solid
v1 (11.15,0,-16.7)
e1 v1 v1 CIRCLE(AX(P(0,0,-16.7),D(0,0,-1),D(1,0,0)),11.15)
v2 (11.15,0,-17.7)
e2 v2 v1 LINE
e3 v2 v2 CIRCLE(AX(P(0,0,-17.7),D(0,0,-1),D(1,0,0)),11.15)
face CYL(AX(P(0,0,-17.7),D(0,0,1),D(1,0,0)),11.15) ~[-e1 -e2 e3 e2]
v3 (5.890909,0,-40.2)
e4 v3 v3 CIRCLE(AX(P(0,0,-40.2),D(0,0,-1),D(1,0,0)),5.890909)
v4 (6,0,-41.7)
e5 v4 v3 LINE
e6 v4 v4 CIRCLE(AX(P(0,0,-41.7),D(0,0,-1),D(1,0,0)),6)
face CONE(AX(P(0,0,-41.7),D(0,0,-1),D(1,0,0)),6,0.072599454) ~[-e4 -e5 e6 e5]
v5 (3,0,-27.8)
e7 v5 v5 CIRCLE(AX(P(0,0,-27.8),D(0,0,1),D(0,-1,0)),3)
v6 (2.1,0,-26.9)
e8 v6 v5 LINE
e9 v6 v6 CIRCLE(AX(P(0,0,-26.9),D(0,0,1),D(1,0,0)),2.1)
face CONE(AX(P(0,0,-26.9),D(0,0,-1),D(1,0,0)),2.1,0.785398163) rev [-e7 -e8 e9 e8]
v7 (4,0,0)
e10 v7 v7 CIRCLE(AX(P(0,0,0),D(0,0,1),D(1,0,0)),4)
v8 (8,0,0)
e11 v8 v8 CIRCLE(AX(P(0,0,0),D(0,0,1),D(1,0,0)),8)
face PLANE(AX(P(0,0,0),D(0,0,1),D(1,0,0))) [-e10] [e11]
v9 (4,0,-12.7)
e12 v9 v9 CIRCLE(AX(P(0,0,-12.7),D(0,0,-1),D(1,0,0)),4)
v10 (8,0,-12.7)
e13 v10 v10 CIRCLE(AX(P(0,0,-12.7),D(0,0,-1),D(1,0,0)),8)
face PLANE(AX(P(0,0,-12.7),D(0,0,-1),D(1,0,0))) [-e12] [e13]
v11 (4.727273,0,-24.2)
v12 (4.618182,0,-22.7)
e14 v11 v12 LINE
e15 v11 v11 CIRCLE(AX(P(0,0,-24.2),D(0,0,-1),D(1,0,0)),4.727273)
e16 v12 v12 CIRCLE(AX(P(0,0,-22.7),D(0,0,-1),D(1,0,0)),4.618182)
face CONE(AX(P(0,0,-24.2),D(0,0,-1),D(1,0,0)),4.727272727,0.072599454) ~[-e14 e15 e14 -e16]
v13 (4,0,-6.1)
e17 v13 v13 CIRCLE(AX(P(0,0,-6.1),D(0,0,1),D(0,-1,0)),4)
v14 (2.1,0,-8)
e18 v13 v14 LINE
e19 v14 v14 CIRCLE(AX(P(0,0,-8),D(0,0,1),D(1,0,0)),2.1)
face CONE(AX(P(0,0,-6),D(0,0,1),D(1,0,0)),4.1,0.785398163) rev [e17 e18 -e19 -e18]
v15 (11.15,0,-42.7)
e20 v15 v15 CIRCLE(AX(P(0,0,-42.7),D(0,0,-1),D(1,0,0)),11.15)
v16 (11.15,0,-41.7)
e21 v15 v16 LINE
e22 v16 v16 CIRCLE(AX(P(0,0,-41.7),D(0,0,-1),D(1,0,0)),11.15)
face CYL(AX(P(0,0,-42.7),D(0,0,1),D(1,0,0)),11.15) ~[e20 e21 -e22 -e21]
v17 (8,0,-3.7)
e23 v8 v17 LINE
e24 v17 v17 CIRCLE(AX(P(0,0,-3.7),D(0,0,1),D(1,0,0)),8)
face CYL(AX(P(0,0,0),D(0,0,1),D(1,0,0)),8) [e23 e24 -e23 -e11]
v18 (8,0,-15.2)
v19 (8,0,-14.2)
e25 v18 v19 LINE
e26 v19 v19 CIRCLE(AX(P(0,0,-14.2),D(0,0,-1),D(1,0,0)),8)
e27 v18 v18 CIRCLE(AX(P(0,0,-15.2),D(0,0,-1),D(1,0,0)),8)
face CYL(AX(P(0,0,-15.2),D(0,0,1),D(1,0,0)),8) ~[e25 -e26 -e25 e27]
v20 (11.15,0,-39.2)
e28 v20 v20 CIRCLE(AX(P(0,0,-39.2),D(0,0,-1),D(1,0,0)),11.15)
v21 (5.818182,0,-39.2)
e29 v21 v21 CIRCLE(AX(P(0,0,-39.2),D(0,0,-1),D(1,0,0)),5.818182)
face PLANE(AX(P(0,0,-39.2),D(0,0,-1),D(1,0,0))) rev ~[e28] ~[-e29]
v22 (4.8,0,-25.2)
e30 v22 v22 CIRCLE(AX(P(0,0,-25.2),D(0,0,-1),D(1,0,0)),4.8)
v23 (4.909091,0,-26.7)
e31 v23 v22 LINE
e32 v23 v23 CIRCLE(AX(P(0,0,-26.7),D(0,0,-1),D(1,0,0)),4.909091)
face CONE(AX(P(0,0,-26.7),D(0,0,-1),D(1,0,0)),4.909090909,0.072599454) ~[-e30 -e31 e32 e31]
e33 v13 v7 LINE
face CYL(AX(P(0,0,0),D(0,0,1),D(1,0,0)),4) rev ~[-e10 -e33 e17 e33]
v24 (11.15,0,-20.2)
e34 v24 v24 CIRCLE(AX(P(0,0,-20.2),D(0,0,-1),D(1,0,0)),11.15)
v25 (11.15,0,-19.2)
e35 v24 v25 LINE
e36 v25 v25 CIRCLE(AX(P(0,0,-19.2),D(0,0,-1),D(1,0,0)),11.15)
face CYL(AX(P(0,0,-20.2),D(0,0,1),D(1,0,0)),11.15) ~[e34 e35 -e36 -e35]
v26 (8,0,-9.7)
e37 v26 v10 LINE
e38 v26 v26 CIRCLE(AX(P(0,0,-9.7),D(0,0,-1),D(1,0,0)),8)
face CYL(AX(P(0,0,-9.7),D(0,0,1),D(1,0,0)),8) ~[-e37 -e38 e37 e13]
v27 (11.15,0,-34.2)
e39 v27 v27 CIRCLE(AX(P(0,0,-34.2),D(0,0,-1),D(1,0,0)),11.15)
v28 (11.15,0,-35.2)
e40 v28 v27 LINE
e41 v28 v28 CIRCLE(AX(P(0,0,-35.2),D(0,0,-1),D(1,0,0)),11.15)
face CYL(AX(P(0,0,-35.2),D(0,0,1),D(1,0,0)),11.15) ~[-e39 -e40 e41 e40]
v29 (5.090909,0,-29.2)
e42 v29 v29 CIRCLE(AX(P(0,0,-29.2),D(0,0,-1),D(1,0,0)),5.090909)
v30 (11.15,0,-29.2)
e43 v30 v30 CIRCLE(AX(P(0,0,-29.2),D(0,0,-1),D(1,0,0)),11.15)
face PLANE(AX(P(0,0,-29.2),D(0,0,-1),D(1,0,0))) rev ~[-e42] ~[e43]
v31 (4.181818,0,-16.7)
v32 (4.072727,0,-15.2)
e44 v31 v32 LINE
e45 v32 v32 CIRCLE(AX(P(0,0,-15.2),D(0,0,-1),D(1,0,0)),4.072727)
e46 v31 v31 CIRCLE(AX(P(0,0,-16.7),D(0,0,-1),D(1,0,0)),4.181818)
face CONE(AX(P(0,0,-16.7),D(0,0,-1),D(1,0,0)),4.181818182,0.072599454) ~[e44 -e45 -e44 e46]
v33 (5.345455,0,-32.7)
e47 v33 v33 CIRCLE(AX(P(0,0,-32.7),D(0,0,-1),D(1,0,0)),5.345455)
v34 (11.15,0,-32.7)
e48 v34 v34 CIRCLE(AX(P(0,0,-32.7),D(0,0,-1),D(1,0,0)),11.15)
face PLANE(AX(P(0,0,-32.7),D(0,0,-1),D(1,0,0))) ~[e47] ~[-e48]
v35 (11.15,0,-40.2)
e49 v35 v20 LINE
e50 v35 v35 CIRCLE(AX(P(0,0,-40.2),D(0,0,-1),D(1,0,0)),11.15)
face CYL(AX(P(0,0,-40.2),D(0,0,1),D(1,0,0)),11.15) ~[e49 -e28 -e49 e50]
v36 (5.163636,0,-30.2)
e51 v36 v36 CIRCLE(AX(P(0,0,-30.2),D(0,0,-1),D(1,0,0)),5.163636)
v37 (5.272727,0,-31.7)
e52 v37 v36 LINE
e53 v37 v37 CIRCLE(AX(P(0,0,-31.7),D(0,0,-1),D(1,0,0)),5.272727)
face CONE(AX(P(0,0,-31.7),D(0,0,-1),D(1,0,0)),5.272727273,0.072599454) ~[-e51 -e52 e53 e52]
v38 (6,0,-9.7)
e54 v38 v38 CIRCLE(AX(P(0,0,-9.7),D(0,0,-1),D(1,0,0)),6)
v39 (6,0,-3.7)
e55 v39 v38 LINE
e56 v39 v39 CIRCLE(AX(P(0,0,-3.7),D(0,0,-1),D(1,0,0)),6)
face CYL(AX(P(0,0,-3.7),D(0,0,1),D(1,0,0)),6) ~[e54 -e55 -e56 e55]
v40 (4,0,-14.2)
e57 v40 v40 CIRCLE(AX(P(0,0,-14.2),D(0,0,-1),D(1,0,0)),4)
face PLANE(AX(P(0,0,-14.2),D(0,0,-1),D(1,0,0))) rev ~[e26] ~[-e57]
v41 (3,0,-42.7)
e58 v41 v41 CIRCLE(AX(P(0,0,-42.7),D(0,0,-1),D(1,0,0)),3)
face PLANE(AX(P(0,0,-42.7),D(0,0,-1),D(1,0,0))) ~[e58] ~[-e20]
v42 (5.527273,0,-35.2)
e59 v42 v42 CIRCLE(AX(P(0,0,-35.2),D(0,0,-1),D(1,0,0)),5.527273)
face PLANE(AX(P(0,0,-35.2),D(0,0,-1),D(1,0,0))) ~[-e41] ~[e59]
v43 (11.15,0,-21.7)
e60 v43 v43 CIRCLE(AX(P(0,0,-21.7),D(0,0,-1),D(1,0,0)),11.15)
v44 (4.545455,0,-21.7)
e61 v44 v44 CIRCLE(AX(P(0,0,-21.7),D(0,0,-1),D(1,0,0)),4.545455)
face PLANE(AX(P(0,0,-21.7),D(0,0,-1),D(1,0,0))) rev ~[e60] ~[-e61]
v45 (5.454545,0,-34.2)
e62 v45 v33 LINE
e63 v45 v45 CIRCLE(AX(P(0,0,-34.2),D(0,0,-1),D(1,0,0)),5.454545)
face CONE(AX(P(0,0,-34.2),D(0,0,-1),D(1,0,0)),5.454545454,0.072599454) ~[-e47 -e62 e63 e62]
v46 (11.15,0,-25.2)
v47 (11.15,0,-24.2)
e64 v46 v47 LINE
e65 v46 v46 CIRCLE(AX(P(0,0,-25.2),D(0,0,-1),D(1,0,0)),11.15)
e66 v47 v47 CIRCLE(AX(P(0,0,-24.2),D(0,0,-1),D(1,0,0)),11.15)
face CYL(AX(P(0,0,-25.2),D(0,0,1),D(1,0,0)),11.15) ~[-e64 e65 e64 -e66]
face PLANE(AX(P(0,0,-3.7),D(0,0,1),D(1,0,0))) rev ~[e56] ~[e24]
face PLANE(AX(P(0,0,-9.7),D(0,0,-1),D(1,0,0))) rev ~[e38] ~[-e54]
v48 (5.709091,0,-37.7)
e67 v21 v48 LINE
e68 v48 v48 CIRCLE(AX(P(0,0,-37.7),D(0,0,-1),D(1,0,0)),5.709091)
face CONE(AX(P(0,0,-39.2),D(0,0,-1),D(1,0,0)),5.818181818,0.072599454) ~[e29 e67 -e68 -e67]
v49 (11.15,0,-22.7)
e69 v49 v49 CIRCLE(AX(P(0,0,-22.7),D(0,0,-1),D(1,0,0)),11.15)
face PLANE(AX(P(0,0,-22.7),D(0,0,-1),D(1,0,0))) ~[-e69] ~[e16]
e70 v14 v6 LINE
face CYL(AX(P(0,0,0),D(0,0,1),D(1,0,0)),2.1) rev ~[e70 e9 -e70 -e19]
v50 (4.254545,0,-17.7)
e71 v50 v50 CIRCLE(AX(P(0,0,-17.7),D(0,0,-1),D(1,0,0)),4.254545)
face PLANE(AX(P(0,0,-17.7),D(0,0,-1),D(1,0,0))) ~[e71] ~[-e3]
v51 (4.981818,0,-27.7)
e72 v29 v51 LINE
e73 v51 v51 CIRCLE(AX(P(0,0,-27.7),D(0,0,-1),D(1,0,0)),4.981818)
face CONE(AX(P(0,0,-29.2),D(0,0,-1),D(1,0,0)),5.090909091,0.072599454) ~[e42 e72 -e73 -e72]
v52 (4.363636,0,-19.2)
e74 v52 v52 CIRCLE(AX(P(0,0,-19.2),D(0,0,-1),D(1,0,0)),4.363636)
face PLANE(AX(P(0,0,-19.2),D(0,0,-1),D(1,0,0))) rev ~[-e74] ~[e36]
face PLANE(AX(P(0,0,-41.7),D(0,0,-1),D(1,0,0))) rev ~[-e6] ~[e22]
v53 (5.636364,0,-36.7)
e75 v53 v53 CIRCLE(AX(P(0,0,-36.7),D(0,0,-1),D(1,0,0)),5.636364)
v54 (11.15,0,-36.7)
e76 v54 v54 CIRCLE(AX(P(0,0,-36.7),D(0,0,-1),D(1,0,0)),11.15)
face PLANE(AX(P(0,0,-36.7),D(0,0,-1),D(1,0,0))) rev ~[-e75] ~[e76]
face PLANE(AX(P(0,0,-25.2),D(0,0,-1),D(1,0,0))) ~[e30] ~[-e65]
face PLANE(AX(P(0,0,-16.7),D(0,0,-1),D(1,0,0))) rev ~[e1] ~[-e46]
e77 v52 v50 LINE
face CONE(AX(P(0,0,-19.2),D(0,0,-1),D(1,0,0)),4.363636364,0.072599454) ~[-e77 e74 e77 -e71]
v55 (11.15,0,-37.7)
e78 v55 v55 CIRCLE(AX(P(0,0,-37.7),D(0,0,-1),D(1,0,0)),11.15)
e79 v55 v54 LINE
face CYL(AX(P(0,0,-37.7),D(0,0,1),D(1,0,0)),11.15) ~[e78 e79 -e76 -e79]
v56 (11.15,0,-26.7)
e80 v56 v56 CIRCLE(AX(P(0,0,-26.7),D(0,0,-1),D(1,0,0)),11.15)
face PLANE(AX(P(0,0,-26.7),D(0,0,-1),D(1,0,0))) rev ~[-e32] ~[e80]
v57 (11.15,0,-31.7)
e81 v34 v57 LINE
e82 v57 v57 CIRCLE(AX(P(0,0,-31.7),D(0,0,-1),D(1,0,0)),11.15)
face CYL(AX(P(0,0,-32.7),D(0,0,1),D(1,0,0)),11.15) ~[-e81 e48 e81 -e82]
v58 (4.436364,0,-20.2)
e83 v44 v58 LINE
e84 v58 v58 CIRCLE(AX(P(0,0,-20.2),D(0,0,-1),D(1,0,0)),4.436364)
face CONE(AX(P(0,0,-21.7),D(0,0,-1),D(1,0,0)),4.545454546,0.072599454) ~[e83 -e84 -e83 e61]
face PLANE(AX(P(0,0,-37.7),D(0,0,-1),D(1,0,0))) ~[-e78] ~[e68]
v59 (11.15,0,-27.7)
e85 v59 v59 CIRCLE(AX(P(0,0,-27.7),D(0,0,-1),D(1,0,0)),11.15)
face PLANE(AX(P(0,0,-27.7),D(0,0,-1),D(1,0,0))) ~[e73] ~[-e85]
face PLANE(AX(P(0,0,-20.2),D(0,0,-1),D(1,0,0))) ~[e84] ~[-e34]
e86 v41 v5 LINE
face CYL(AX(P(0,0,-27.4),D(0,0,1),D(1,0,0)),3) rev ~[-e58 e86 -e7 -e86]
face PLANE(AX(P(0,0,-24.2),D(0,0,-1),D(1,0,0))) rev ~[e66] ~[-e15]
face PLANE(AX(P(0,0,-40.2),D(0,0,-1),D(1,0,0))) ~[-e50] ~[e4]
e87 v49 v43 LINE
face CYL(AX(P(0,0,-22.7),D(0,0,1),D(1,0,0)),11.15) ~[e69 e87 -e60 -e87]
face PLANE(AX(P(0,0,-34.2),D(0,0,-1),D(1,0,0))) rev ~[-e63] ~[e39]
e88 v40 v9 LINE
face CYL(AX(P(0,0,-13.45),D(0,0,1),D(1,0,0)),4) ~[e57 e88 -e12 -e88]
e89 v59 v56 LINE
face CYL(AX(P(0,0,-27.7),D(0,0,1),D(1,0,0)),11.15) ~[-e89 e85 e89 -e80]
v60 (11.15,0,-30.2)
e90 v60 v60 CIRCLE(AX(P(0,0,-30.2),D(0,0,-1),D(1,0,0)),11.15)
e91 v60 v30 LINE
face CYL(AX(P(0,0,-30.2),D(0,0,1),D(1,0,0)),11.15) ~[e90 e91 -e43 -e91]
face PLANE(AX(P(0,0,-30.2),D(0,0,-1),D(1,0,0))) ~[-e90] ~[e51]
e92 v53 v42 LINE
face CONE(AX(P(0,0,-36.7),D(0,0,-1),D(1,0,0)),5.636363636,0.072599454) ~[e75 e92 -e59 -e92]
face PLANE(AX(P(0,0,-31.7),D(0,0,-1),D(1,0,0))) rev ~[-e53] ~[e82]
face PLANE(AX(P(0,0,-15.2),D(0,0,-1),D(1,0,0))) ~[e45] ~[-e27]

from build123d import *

# Parameters (mm, degrees)
F0_R         = 8
F1_DEPTH     = 3.7
F2_R         = 6
F3_DEPTH     = 6
F4_R         = 8
F5_DEPTH     = 3
F6_W         = 4
F6_H         = 1.5
F8_R         = 2.1
F9_DEPTH     = 42.7
F10_R        = 4
F11_DEPTH    = 6
F12_S5_R     = 4
F12_T6_DEPTH = 7
F13_R        = 3
F14_DEPTH    = 14.8
F15_S5_R     = 3
F15_T6_DEPTH = 6


# Not quite as in the source:
# - a fillet or chamfer that OpenCascade refuses, or shapes differently, is made with other operations: its cross-section is extruded or revolved along the edge and cut away or added


with BuildPart() as f1:
    # F0 (on Top) → F1 (new body)
    with BuildSketch(Plane.XY):
        Circle(F0_R)
    extrude(amount=-F1_DEPTH)

    # F2 (on face) → F3 (join)
    with BuildSketch(Plane(origin=(0, 0, -3.7), x_dir=(1, 0, 0), z_dir=(0, 0, -1))):
        Circle(F2_R)
    extrude(amount=F3_DEPTH)

    # F4 (on face) → F5 (join)
    with BuildSketch(Plane(origin=(0, 0, -9.7), x_dir=(1, 0, 0), z_dir=(0, 0, -1))):
        Circle(F4_R)
    extrude(amount=F5_DEPTH)

    # F6 (on Front) → F7 (revolve)
    with BuildSketch(Plane.XZ):
        with Locations((2, -13.45)):
            Rectangle(F6_W, F6_H)
        Polygon((4, -14.2), (0, -14.2), (0, -15.2), (4.0727272727, -15.2), (8, -15.2), (8, -14.2), align=None)
        Polygon((4.0727272727, -15.2), (0, -15.2), (0, -16.7), (4.1818181818, -16.7), align=None)
        Polygon((4.1818181818, -16.7), (0, -16.7), (0, -17.7), (4.2545454545, -17.7), (11.15, -17.7), (11.15, -16.7), align=None)
        Polygon((4.2545454545, -17.7), (0, -17.7), (0, -19.2), (4.3636363636, -19.2), align=None)
        Polygon((4.3636363636, -19.2), (0, -19.2), (0, -20.2), (4.4363636364, -20.2), (11.15, -20.2), (11.15, -19.2), align=None)
        Polygon((4.4363636364, -20.2), (0, -20.2), (0, -21.7), (4.5454545455, -21.7), align=None)
        Polygon((4.5454545455, -21.7), (0, -21.7), (0, -22.7), (4.6181818182, -22.7), (11.15, -22.7), (11.15, -21.7), align=None)
        Polygon((4.6181818182, -22.7), (0, -22.7), (0, -24.2), (4.7272727273, -24.2), align=None)
        Polygon((4.7272727273, -24.2), (0, -24.2), (0, -25.2), (4.8, -25.2), (11.15, -25.2), (11.15, -24.2), align=None)
        Polygon((4.8, -25.2), (0, -25.2), (0, -26.7), (4.9090909091, -26.7), align=None)
        Polygon((4.9090909091, -26.7), (0, -26.7), (0, -27.7), (4.9818181818, -27.7), (11.15, -27.7), (11.15, -26.7), align=None)
        Polygon((4.9818181818, -27.7), (0, -27.7), (0, -29.2), (5.0909090909, -29.2), align=None)
        Polygon((5.0909090909, -29.2), (0, -29.2), (0, -30.2), (5.1636363636, -30.2), (11.15, -30.2), (11.15, -29.2), align=None)
        Polygon((5.1636363636, -30.2), (0, -30.2), (0, -31.7), (5.2727272727, -31.7), align=None)
        Polygon((5.2727272727, -31.7), (0, -31.7), (0, -32.7), (5.3454545455, -32.7), (11.15, -32.7), (11.15, -31.7), align=None)
        Polygon((5.3454545455, -32.7), (0, -32.7), (0, -34.2), (5.4545454545, -34.2), align=None)
        Polygon((5.4545454545, -34.2), (0, -34.2), (0, -35.2), (5.5272727273, -35.2), (11.15, -35.2), (11.15, -34.2), align=None)
        Polygon((5.5272727273, -35.2), (0, -35.2), (0, -36.7), (5.6363636364, -36.7), align=None)
        Polygon((5.6363636364, -36.7), (0, -36.7), (0, -37.7), (5.7090909091, -37.7), (11.15, -37.7), (11.15, -36.7), align=None)
        Polygon((5.7090909091, -37.7), (0, -37.7), (0, -39.2), (5.8181818182, -39.2), align=None)
        Polygon((5.8181818182, -39.2), (0, -39.2), (0, -40.2), (5.8909090909, -40.2), (11.15, -40.2), (11.15, -39.2), align=None)
        Polygon((5.8909090909, -40.2), (0, -40.2), (0, -41.7), (6, -41.7), align=None)
        Polygon((6, -41.7), (0, -41.7), (0, -42.7), (11.15, -42.7), (11.15, -41.7), align=None)
    revolve(axis=Axis((0, 0, -6.35), (0, 0, -1)))

    # F8 (on face) → F9 (cut)
    with BuildSketch(Plane.XY):
        Circle(F8_R)
    extrude(amount=-F9_DEPTH, mode=Mode.SUBTRACT)

    # F10 (on face) → F11 (cut)
    with BuildSketch(Plane.XY):
        Circle(F10_R)
    extrude(amount=-F11_DEPTH, mode=Mode.SUBTRACT)

    # F12: chamfer of 2 on 1 edges, made by hand


with BuildPart() as f12_tool2:
    # F12_s3 → F12_t4 (revolve)
    with BuildSketch(Plane.XZ):
        Polygon((4.1, -6), (2.1, -8), (2.1, -6), align=None)
    revolve(axis=Axis((0, 0, -6), (0, 0, 1)))

    # F12_s5 → F12_t6 (intersect, symmetric)
    with BuildSketch(Plane.XY.offset(-7)):
        Circle(F12_S5_R)
    extrude(amount=F12_T6_DEPTH, both=True, mode=Mode.INTERSECT)


with BuildPart() as f1_1:
    add(f1.part)

    # F12_t1: cut F12_tool2
    add(f12_tool2.part, mode=Mode.SUBTRACT)

    # F13 (on face) → F14 (cut)
    with BuildSketch(Plane(origin=(0, 0, -42.7), x_dir=(1, 0, 0), z_dir=(0, 0, -1))):
        Circle(F13_R)
    extrude(amount=-F14_DEPTH, mode=Mode.SUBTRACT)

    # F15: chamfer of 1 on 1 edges, made by hand


with BuildPart() as f15_tool2:
    # F15_s3 → F15_t4 (revolve)
    with BuildSketch(Plane.XZ):
        Polygon((2.1, -26.9), (3.1, -27.9), (2.1, -27.9), align=None)
    revolve(axis=Axis((0, 0, -27.9), (0, 0, 1)))

    # F15_s5 → F15_t6 (intersect, symmetric)
    with BuildSketch(Plane.XY.offset(-27.4)):
        Circle(F15_S5_R)
    extrude(amount=F15_T6_DEPTH, both=True, mode=Mode.INTERSECT)


with BuildPart() as f1_2:
    add(f1_1.part)

    # F15_t1: cut F15_tool2
    add(f15_tool2.part, mode=Mode.SUBTRACT)


solid = f1_2.part
